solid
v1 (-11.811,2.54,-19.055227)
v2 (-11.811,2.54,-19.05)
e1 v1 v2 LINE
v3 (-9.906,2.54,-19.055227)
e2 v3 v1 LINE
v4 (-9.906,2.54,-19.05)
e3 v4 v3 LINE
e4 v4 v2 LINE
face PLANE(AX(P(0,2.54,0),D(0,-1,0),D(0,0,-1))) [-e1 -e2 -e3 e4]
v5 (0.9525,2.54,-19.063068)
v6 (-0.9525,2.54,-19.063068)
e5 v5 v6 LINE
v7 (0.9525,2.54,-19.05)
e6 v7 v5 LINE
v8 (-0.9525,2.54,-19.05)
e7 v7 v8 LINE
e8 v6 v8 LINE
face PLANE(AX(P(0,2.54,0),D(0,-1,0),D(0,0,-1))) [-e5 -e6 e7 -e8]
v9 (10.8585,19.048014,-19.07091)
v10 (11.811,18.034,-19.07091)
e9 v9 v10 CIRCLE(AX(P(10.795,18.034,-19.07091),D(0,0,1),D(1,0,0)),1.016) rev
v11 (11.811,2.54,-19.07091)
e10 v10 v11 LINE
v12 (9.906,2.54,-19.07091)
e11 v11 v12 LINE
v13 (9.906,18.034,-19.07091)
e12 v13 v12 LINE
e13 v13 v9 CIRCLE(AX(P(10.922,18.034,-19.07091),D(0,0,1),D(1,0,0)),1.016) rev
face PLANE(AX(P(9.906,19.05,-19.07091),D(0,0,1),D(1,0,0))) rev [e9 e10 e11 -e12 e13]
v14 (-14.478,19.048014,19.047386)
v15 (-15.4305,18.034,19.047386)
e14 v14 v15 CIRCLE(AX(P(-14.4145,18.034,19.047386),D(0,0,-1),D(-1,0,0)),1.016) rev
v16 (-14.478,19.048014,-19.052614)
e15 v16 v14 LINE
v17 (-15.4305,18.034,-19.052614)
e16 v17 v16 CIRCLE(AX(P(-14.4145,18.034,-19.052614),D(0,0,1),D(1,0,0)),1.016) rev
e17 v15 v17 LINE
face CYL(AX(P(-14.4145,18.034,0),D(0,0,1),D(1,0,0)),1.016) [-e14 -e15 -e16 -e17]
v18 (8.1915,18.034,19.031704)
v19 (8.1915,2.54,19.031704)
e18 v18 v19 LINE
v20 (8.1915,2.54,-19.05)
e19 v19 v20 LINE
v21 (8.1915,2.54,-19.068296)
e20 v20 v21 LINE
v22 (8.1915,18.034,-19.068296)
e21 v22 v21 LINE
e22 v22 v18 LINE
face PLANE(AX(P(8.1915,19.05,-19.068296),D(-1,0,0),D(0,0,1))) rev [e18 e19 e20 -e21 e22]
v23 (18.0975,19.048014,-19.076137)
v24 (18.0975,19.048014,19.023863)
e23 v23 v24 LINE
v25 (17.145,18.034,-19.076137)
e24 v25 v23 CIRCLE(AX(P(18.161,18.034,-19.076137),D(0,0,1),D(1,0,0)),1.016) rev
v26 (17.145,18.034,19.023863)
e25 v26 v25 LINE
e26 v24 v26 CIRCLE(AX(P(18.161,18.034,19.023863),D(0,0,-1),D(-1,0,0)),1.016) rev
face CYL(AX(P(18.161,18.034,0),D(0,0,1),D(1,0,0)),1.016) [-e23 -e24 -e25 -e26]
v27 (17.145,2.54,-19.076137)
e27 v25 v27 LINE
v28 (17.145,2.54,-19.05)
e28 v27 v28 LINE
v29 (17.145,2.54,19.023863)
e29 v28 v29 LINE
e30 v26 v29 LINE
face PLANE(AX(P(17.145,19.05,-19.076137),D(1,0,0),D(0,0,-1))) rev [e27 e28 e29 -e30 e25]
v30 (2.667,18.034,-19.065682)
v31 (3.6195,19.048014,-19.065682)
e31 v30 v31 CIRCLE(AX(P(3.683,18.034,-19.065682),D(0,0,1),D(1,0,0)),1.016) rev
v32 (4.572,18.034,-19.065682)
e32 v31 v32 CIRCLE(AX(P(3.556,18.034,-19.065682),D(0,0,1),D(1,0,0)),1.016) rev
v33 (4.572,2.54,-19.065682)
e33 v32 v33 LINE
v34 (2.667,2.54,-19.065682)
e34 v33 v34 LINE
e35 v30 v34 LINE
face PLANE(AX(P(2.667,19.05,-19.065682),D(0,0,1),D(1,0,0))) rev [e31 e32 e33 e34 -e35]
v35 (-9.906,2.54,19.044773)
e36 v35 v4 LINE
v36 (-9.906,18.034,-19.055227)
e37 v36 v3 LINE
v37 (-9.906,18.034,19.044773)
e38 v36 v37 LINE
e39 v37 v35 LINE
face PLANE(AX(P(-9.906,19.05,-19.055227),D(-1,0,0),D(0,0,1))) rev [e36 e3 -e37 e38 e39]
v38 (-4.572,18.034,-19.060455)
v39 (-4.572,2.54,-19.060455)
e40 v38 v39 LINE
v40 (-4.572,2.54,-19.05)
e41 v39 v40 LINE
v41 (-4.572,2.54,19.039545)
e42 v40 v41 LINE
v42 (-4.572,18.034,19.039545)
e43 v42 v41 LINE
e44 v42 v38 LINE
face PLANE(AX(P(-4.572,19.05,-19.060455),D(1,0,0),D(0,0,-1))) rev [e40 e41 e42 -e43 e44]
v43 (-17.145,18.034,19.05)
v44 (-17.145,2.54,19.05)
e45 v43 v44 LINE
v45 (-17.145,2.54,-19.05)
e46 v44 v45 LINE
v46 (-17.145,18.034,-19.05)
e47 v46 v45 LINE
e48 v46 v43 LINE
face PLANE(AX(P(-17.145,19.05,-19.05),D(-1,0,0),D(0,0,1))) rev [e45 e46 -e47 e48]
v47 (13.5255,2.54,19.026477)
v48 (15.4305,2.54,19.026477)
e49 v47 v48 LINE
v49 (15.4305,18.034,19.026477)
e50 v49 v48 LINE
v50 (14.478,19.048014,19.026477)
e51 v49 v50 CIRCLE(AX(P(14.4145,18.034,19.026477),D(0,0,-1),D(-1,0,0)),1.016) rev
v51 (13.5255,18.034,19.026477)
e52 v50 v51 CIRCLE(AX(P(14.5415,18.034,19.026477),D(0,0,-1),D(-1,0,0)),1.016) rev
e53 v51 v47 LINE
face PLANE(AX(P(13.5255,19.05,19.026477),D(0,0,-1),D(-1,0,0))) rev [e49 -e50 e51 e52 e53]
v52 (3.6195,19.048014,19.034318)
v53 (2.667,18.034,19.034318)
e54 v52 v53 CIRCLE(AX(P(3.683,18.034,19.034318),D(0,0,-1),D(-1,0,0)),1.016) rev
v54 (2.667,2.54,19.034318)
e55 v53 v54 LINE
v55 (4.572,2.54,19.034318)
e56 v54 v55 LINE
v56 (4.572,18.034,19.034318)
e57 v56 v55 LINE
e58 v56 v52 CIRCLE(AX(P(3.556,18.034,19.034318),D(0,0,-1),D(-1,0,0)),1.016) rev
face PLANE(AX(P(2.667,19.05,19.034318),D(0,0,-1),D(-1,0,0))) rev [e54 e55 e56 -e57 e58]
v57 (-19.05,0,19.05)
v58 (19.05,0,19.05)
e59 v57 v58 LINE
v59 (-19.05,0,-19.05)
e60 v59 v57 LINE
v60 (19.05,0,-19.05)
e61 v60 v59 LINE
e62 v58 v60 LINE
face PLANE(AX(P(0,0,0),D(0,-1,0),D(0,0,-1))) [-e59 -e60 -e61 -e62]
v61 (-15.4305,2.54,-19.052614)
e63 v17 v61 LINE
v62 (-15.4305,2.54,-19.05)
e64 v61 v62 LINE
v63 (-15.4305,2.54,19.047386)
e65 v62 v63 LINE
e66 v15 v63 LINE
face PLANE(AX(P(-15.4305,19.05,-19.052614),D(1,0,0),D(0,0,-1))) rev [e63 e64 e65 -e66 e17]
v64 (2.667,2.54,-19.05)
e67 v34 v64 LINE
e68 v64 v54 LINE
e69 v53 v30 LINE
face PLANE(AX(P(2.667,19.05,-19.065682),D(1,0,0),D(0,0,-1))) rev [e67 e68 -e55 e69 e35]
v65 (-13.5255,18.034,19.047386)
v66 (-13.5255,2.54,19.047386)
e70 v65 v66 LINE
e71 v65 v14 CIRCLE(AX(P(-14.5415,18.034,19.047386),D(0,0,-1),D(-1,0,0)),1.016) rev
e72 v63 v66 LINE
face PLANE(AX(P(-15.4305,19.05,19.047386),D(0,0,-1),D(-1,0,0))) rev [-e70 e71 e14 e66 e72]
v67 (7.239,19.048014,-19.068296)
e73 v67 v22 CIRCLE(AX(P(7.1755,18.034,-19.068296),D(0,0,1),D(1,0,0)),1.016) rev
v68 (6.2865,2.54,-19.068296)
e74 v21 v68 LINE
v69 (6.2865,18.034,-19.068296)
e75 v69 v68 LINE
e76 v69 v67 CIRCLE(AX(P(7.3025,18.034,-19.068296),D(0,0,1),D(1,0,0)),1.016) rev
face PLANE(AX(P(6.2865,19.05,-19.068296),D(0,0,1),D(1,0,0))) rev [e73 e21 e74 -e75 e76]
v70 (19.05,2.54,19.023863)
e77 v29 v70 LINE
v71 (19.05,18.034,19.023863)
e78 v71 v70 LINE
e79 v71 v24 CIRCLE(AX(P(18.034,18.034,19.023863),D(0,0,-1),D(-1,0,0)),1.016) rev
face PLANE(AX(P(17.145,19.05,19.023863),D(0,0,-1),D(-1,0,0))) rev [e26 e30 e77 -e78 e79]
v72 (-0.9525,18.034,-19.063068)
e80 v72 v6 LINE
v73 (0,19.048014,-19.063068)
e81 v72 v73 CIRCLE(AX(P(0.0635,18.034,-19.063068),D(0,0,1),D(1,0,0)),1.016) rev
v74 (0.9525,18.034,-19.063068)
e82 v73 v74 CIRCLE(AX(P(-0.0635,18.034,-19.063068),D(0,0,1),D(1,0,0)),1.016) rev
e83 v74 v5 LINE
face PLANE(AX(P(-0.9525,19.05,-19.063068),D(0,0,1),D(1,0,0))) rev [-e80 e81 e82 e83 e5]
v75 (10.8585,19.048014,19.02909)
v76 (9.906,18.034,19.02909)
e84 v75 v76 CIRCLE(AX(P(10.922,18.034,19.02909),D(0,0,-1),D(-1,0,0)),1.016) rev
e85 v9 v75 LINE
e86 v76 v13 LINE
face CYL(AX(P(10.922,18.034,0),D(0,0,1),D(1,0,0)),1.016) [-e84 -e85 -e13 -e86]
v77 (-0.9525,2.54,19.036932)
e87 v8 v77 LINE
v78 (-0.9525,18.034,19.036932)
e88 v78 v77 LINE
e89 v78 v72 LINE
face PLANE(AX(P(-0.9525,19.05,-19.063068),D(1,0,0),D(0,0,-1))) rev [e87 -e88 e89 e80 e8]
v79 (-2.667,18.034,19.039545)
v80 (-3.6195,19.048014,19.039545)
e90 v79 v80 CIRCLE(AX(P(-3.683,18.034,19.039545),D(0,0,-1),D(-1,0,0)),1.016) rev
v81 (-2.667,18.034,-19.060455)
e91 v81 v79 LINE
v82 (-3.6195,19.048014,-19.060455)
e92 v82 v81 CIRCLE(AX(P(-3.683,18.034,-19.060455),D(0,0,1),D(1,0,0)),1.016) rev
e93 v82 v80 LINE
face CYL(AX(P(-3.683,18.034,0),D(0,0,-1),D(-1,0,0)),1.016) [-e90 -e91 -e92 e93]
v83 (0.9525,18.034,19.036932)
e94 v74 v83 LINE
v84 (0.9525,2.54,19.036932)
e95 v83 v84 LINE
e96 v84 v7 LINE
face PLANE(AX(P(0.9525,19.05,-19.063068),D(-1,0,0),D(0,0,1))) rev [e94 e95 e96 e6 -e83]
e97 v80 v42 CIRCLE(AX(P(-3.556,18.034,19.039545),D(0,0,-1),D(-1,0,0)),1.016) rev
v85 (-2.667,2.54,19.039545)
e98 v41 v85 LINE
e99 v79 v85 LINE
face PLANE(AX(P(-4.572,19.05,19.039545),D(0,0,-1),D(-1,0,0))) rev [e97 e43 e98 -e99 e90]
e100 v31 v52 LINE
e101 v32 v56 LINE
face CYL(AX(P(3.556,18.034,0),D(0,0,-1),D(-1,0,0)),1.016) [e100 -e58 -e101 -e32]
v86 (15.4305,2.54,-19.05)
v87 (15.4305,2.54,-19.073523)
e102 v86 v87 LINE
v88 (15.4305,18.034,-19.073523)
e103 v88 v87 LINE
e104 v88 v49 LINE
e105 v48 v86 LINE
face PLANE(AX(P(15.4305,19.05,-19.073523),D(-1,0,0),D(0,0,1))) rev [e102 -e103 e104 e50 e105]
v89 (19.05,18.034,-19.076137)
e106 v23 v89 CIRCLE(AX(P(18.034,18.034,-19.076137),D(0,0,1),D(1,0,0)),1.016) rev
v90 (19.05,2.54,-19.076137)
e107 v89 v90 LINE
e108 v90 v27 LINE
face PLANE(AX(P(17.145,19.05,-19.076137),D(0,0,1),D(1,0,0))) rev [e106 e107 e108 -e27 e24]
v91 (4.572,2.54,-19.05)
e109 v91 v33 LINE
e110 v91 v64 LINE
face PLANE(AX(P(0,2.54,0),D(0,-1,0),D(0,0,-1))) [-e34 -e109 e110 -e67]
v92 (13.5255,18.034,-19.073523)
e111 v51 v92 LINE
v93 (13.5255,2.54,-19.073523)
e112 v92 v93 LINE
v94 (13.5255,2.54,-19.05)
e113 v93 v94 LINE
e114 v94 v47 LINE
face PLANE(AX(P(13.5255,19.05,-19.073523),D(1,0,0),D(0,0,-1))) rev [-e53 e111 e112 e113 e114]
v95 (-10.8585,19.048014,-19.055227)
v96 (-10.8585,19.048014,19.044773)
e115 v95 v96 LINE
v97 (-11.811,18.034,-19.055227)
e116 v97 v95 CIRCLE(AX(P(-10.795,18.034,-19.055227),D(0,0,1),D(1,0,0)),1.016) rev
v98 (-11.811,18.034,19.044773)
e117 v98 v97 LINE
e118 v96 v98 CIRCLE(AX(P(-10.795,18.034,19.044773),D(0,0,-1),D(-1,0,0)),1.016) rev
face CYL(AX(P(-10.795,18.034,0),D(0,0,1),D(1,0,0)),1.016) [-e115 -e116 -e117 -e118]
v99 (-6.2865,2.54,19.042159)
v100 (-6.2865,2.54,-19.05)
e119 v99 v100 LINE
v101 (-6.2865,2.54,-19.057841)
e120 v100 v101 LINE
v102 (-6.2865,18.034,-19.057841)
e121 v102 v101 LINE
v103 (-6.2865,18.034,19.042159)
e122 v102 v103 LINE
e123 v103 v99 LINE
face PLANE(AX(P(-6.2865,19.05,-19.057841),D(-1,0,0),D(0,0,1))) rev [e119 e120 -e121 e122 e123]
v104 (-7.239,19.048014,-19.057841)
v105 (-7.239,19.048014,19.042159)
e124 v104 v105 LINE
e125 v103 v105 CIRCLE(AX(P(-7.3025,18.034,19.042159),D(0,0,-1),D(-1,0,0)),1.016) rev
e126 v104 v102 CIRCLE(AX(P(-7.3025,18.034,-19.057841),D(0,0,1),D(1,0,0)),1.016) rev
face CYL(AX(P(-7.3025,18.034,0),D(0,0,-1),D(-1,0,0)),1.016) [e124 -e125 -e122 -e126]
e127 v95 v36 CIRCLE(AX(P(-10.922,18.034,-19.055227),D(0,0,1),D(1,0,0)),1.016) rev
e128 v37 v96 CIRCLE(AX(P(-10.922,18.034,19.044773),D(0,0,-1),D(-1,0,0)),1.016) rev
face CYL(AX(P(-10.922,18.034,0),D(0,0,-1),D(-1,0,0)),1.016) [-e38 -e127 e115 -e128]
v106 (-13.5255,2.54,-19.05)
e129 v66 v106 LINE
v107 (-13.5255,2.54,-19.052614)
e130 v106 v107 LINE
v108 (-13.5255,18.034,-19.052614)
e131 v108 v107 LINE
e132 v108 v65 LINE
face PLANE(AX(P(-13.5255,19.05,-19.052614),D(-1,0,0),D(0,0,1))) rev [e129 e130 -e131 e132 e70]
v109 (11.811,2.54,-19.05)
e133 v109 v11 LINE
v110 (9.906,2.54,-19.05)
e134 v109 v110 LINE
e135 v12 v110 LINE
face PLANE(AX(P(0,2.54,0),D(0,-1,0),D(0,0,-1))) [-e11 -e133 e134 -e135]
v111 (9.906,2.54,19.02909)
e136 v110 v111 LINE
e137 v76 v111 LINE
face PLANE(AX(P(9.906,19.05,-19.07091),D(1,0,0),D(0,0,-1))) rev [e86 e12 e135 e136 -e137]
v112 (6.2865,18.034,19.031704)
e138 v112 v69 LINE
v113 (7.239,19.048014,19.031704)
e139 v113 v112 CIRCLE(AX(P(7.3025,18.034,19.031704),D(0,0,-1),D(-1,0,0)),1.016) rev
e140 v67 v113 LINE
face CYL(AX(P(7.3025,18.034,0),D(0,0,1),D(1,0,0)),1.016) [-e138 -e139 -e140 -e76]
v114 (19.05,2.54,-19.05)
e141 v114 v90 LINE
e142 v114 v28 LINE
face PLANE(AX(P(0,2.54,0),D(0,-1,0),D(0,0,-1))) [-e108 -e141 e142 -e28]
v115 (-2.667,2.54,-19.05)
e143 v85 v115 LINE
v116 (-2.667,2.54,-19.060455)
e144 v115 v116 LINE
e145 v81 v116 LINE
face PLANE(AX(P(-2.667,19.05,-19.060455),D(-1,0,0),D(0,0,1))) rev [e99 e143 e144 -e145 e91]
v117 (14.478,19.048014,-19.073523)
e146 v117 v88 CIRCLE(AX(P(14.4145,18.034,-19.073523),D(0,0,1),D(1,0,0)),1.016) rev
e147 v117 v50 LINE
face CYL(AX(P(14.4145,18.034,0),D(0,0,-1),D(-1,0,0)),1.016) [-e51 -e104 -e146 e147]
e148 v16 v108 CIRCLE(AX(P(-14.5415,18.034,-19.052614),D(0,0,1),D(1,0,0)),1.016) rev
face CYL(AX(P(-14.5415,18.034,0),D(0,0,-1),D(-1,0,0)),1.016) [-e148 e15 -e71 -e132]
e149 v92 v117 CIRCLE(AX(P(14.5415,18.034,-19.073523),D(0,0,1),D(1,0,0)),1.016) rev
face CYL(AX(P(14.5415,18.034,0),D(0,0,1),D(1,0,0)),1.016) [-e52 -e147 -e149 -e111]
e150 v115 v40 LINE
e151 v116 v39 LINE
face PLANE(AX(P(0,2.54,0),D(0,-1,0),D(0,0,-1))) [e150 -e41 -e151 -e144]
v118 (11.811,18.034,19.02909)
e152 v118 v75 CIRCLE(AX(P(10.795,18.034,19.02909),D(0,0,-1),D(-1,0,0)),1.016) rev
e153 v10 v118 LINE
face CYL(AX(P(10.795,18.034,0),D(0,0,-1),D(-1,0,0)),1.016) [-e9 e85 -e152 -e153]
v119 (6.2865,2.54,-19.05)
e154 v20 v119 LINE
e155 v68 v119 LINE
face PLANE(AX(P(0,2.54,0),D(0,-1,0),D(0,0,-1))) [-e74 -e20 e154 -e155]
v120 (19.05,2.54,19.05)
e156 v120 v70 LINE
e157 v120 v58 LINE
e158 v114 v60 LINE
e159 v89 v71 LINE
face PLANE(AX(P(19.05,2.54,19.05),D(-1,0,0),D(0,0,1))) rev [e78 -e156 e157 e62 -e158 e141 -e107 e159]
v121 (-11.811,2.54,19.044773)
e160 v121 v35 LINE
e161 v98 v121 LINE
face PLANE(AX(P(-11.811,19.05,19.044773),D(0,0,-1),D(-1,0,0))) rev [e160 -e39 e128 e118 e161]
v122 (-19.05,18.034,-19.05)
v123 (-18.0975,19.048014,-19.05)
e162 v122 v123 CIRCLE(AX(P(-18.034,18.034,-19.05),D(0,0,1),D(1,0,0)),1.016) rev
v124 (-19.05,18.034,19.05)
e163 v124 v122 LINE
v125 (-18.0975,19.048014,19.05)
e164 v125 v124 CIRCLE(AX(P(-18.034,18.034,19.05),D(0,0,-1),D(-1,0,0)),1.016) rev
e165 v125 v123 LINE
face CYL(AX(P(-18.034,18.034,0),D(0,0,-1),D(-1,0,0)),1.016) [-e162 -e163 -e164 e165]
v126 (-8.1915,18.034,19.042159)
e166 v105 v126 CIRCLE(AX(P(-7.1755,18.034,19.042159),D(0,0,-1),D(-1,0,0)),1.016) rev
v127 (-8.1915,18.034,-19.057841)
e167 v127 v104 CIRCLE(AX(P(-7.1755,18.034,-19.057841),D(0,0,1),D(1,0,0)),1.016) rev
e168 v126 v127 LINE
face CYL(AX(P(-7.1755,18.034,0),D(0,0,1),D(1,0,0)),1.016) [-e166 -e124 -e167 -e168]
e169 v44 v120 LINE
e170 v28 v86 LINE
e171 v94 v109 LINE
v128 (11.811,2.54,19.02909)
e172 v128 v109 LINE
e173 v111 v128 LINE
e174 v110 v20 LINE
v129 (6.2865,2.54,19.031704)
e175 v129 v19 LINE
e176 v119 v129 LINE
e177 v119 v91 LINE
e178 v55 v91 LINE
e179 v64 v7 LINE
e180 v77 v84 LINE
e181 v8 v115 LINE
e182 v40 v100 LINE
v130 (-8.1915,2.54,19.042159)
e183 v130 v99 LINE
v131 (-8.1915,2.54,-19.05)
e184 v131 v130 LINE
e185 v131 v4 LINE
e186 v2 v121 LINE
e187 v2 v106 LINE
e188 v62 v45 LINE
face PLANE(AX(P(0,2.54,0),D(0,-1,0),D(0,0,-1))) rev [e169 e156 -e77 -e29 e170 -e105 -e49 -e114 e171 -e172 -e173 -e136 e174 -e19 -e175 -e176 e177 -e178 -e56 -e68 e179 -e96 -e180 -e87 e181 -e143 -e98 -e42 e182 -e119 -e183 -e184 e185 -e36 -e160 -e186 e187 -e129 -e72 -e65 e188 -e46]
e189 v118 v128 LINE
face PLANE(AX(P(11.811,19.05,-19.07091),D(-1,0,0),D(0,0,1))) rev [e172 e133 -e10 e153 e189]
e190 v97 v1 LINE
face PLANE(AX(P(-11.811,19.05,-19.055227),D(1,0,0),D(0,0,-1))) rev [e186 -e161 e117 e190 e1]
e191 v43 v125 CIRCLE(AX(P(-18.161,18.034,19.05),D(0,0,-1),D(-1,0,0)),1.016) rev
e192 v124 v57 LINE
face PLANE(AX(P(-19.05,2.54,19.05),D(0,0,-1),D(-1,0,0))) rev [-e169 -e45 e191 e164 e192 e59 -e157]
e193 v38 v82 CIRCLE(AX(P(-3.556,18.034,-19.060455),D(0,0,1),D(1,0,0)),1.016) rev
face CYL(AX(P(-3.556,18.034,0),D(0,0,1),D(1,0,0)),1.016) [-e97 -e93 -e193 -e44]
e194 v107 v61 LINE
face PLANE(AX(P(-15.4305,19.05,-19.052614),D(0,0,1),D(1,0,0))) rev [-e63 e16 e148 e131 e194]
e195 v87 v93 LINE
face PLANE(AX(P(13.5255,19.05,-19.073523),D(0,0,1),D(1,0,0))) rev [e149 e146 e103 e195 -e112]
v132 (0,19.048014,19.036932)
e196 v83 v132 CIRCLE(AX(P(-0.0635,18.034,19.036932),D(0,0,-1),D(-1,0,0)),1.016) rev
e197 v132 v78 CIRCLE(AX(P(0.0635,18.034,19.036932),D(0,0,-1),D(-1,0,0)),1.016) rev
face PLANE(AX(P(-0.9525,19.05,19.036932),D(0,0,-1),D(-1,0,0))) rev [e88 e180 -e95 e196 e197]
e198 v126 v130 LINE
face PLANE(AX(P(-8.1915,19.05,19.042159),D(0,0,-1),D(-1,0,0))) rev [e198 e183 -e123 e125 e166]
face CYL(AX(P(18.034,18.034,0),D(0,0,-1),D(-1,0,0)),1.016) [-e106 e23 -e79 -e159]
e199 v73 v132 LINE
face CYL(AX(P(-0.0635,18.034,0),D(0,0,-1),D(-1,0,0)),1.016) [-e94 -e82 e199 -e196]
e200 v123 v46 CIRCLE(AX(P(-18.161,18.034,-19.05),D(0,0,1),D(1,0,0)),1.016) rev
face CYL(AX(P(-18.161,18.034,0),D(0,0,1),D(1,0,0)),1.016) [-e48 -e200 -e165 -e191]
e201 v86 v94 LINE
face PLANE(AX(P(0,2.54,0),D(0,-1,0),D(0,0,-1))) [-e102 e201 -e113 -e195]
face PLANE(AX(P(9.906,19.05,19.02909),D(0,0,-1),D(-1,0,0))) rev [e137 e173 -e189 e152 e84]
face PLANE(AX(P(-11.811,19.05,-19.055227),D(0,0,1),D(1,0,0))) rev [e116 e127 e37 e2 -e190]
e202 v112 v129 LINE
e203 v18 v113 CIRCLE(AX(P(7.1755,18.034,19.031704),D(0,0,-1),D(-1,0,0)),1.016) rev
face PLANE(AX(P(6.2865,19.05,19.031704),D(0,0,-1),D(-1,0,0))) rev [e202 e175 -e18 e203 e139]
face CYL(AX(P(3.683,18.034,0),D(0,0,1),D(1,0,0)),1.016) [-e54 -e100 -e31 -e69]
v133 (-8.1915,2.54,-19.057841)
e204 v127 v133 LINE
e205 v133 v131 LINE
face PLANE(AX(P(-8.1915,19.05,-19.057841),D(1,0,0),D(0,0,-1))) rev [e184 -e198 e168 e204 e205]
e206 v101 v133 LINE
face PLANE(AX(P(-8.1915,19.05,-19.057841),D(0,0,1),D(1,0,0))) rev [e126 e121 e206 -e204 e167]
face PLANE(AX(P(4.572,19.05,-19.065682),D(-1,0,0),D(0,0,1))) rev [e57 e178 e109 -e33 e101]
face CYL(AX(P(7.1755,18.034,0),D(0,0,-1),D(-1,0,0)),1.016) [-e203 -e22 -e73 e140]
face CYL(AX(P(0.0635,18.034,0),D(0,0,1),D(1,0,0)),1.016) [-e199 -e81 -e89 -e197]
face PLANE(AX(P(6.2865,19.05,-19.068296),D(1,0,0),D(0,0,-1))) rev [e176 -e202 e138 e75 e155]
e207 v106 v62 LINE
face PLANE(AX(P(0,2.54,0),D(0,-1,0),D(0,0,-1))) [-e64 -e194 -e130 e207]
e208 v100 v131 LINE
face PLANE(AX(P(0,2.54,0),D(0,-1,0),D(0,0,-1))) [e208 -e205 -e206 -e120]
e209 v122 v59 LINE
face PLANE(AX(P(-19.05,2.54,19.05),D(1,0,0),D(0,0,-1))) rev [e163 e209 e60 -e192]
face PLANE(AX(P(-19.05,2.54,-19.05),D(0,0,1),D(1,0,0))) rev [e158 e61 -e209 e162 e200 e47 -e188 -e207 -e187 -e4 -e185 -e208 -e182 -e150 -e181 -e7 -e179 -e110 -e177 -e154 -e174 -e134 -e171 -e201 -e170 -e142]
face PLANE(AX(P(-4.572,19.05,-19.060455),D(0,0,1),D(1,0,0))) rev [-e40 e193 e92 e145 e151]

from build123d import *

# Parameters (mm, degrees)
SKETCH1_W           = 38.1
SKETCH1_H           = 38.1
BOSS_EXTRUDE1_DEPTH = 2.54
SKETCH2_W           = 1.905
SKETCH2_H           = 38.1
BOSS_EXTRUDE2_DEPTH = 16.51
FILLET3_R           = 1.016


with BuildPart() as part:
    # Sketch1 → Boss-Extrude1 (new body)
    with BuildSketch(Plane(origin=(0, 0, 0), x_dir=(1, 0, 0), z_dir=(0, 1, 0))):
        Rectangle(SKETCH1_W, SKETCH1_H)
    extrude(amount=BOSS_EXTRUDE1_DEPTH)

    # Sketch2 → Boss-Extrude2 (add)
    with BuildSketch(Plane(origin=(0, 2.54, 0), x_dir=(1, 0, 0), z_dir=(0, 1, 0))):
        with Locations((-18.0975, 0)):
            Rectangle(SKETCH2_W, SKETCH2_H)
        with Locations((-14.478, 0.002613699)):
            Rectangle(SKETCH2_W, SKETCH2_H)
        with Locations((-10.8585, 0.005227397)):
            Rectangle(SKETCH2_W, SKETCH2_H)
        with Locations((-7.239, 0.007841096)):
            Rectangle(SKETCH2_W, SKETCH2_H)
        with Locations((-3.6195, 0.010454795)):
            Rectangle(SKETCH2_W, SKETCH2_H)
        with Locations((0, 0.013068494)):
            Rectangle(SKETCH2_W, SKETCH2_H)
        with Locations((3.6195, 0.015682192)):
            Rectangle(SKETCH2_W, SKETCH2_H)
        with Locations((7.239, 0.018295891)):
            Rectangle(SKETCH2_W, SKETCH2_H)
        with Locations((10.8585, 0.02090959)):
            Rectangle(SKETCH2_W, SKETCH2_H)
        with Locations((14.478, 0.023523288)):
            Rectangle(SKETCH2_W, SKETCH2_H)
        with Locations((18.0975, 0.026136987)):
            Rectangle(SKETCH2_W, SKETCH2_H)
    extrude(amount=BOSS_EXTRUDE2_DEPTH)

    # Fillet3
    # the kernel refuses this fillet: 1.016 mm, written as the material it takes off along each edge
    with BuildSketch(Plane(origin=(-19.05, 19.05, 21.59), x_dir=(1, 0, 0), z_dir=(0, 0, -1)), Plane(origin=(17.145, 19.05, -21.616136987), x_dir=(0, -1, 0), z_dir=(0, 0, 1)), Plane(origin=(13.5255, 19.05, -21.613523288), x_dir=(0, -1, 0), z_dir=(0, 0, 1)), Plane(origin=(9.906, 19.05, -21.61090959), x_dir=(0, -1, 0), z_dir=(0, 0, 1)), Plane(origin=(6.2865, 19.05, -21.608295891), x_dir=(0, -1, 0), z_dir=(0, 0, 1)), Plane(origin=(2.667, 19.05, -21.605682192), x_dir=(0, -1, 0), z_dir=(0, 0, 1)), Plane(origin=(-0.9525, 19.05, -21.603068494), x_dir=(0, -1, 0), z_dir=(0, 0, 1)), Plane(origin=(-4.572, 19.05, -21.600454795), x_dir=(0, -1, 0), z_dir=(0, 0, 1)), Plane(origin=(-8.1915, 19.05, -21.597841096), x_dir=(0, -1, 0), z_dir=(0, 0, 1)), Plane(origin=(-11.811, 19.05, -21.595227397), x_dir=(0, -1, 0), z_dir=(0, 0, 1)), Plane(origin=(-15.4305, 19.05, -21.592613699), x_dir=(0, -1, 0), z_dir=(0, 0, 1))) as fillet3_piece_1:
        with BuildLine():
            CenterArc((FILLET3_R, FILLET3_R), FILLET3_R, 180, 90)
            Line((0, FILLET3_R), (0, 0))
            Line((0, 0), (FILLET3_R, 0))
        make_face()
    extrude(amount=43.18, mode=Mode.SUBTRACT)
    with BuildSketch(Plane(origin=(-17.145, 19.05, -21.59), x_dir=(0, -1, 0), z_dir=(0, 0, 1)), Plane(origin=(19.05, 19.05, 21.563863013), x_dir=(-1, 0, 0), z_dir=(0, 0, -1)), Plane(origin=(15.4305, 19.05, 21.566476712), x_dir=(-1, 0, 0), z_dir=(0, 0, -1)), Plane(origin=(11.811, 19.05, 21.56909041), x_dir=(-1, 0, 0), z_dir=(0, 0, -1)), Plane(origin=(8.1915, 19.05, 21.571704109), x_dir=(-1, 0, 0), z_dir=(0, 0, -1)), Plane(origin=(4.572, 19.05, 21.574317808), x_dir=(-1, 0, 0), z_dir=(0, 0, -1)), Plane(origin=(0.9525, 19.05, 21.576931506), x_dir=(-1, 0, 0), z_dir=(0, 0, -1)), Plane(origin=(-2.667, 19.05, 21.579545205), x_dir=(-1, 0, 0), z_dir=(0, 0, -1)), Plane(origin=(-6.2865, 19.05, 21.582158904), x_dir=(-1, 0, 0), z_dir=(0, 0, -1)), Plane(origin=(-9.906, 19.05, 21.584772603), x_dir=(-1, 0, 0), z_dir=(0, 0, -1)), Plane(origin=(-13.5255, 19.05, 21.587386301), x_dir=(-1, 0, 0), z_dir=(0, 0, -1))) as fillet3_piece_2:
        with BuildLine():
            CenterArc((FILLET3_R, -FILLET3_R), FILLET3_R, 90, 90)
            Line((0, -FILLET3_R), (0, 0))
            Line((0, 0), (FILLET3_R, 0))
        make_face()
    extrude(amount=43.18, mode=Mode.SUBTRACT)


solid = part.part
